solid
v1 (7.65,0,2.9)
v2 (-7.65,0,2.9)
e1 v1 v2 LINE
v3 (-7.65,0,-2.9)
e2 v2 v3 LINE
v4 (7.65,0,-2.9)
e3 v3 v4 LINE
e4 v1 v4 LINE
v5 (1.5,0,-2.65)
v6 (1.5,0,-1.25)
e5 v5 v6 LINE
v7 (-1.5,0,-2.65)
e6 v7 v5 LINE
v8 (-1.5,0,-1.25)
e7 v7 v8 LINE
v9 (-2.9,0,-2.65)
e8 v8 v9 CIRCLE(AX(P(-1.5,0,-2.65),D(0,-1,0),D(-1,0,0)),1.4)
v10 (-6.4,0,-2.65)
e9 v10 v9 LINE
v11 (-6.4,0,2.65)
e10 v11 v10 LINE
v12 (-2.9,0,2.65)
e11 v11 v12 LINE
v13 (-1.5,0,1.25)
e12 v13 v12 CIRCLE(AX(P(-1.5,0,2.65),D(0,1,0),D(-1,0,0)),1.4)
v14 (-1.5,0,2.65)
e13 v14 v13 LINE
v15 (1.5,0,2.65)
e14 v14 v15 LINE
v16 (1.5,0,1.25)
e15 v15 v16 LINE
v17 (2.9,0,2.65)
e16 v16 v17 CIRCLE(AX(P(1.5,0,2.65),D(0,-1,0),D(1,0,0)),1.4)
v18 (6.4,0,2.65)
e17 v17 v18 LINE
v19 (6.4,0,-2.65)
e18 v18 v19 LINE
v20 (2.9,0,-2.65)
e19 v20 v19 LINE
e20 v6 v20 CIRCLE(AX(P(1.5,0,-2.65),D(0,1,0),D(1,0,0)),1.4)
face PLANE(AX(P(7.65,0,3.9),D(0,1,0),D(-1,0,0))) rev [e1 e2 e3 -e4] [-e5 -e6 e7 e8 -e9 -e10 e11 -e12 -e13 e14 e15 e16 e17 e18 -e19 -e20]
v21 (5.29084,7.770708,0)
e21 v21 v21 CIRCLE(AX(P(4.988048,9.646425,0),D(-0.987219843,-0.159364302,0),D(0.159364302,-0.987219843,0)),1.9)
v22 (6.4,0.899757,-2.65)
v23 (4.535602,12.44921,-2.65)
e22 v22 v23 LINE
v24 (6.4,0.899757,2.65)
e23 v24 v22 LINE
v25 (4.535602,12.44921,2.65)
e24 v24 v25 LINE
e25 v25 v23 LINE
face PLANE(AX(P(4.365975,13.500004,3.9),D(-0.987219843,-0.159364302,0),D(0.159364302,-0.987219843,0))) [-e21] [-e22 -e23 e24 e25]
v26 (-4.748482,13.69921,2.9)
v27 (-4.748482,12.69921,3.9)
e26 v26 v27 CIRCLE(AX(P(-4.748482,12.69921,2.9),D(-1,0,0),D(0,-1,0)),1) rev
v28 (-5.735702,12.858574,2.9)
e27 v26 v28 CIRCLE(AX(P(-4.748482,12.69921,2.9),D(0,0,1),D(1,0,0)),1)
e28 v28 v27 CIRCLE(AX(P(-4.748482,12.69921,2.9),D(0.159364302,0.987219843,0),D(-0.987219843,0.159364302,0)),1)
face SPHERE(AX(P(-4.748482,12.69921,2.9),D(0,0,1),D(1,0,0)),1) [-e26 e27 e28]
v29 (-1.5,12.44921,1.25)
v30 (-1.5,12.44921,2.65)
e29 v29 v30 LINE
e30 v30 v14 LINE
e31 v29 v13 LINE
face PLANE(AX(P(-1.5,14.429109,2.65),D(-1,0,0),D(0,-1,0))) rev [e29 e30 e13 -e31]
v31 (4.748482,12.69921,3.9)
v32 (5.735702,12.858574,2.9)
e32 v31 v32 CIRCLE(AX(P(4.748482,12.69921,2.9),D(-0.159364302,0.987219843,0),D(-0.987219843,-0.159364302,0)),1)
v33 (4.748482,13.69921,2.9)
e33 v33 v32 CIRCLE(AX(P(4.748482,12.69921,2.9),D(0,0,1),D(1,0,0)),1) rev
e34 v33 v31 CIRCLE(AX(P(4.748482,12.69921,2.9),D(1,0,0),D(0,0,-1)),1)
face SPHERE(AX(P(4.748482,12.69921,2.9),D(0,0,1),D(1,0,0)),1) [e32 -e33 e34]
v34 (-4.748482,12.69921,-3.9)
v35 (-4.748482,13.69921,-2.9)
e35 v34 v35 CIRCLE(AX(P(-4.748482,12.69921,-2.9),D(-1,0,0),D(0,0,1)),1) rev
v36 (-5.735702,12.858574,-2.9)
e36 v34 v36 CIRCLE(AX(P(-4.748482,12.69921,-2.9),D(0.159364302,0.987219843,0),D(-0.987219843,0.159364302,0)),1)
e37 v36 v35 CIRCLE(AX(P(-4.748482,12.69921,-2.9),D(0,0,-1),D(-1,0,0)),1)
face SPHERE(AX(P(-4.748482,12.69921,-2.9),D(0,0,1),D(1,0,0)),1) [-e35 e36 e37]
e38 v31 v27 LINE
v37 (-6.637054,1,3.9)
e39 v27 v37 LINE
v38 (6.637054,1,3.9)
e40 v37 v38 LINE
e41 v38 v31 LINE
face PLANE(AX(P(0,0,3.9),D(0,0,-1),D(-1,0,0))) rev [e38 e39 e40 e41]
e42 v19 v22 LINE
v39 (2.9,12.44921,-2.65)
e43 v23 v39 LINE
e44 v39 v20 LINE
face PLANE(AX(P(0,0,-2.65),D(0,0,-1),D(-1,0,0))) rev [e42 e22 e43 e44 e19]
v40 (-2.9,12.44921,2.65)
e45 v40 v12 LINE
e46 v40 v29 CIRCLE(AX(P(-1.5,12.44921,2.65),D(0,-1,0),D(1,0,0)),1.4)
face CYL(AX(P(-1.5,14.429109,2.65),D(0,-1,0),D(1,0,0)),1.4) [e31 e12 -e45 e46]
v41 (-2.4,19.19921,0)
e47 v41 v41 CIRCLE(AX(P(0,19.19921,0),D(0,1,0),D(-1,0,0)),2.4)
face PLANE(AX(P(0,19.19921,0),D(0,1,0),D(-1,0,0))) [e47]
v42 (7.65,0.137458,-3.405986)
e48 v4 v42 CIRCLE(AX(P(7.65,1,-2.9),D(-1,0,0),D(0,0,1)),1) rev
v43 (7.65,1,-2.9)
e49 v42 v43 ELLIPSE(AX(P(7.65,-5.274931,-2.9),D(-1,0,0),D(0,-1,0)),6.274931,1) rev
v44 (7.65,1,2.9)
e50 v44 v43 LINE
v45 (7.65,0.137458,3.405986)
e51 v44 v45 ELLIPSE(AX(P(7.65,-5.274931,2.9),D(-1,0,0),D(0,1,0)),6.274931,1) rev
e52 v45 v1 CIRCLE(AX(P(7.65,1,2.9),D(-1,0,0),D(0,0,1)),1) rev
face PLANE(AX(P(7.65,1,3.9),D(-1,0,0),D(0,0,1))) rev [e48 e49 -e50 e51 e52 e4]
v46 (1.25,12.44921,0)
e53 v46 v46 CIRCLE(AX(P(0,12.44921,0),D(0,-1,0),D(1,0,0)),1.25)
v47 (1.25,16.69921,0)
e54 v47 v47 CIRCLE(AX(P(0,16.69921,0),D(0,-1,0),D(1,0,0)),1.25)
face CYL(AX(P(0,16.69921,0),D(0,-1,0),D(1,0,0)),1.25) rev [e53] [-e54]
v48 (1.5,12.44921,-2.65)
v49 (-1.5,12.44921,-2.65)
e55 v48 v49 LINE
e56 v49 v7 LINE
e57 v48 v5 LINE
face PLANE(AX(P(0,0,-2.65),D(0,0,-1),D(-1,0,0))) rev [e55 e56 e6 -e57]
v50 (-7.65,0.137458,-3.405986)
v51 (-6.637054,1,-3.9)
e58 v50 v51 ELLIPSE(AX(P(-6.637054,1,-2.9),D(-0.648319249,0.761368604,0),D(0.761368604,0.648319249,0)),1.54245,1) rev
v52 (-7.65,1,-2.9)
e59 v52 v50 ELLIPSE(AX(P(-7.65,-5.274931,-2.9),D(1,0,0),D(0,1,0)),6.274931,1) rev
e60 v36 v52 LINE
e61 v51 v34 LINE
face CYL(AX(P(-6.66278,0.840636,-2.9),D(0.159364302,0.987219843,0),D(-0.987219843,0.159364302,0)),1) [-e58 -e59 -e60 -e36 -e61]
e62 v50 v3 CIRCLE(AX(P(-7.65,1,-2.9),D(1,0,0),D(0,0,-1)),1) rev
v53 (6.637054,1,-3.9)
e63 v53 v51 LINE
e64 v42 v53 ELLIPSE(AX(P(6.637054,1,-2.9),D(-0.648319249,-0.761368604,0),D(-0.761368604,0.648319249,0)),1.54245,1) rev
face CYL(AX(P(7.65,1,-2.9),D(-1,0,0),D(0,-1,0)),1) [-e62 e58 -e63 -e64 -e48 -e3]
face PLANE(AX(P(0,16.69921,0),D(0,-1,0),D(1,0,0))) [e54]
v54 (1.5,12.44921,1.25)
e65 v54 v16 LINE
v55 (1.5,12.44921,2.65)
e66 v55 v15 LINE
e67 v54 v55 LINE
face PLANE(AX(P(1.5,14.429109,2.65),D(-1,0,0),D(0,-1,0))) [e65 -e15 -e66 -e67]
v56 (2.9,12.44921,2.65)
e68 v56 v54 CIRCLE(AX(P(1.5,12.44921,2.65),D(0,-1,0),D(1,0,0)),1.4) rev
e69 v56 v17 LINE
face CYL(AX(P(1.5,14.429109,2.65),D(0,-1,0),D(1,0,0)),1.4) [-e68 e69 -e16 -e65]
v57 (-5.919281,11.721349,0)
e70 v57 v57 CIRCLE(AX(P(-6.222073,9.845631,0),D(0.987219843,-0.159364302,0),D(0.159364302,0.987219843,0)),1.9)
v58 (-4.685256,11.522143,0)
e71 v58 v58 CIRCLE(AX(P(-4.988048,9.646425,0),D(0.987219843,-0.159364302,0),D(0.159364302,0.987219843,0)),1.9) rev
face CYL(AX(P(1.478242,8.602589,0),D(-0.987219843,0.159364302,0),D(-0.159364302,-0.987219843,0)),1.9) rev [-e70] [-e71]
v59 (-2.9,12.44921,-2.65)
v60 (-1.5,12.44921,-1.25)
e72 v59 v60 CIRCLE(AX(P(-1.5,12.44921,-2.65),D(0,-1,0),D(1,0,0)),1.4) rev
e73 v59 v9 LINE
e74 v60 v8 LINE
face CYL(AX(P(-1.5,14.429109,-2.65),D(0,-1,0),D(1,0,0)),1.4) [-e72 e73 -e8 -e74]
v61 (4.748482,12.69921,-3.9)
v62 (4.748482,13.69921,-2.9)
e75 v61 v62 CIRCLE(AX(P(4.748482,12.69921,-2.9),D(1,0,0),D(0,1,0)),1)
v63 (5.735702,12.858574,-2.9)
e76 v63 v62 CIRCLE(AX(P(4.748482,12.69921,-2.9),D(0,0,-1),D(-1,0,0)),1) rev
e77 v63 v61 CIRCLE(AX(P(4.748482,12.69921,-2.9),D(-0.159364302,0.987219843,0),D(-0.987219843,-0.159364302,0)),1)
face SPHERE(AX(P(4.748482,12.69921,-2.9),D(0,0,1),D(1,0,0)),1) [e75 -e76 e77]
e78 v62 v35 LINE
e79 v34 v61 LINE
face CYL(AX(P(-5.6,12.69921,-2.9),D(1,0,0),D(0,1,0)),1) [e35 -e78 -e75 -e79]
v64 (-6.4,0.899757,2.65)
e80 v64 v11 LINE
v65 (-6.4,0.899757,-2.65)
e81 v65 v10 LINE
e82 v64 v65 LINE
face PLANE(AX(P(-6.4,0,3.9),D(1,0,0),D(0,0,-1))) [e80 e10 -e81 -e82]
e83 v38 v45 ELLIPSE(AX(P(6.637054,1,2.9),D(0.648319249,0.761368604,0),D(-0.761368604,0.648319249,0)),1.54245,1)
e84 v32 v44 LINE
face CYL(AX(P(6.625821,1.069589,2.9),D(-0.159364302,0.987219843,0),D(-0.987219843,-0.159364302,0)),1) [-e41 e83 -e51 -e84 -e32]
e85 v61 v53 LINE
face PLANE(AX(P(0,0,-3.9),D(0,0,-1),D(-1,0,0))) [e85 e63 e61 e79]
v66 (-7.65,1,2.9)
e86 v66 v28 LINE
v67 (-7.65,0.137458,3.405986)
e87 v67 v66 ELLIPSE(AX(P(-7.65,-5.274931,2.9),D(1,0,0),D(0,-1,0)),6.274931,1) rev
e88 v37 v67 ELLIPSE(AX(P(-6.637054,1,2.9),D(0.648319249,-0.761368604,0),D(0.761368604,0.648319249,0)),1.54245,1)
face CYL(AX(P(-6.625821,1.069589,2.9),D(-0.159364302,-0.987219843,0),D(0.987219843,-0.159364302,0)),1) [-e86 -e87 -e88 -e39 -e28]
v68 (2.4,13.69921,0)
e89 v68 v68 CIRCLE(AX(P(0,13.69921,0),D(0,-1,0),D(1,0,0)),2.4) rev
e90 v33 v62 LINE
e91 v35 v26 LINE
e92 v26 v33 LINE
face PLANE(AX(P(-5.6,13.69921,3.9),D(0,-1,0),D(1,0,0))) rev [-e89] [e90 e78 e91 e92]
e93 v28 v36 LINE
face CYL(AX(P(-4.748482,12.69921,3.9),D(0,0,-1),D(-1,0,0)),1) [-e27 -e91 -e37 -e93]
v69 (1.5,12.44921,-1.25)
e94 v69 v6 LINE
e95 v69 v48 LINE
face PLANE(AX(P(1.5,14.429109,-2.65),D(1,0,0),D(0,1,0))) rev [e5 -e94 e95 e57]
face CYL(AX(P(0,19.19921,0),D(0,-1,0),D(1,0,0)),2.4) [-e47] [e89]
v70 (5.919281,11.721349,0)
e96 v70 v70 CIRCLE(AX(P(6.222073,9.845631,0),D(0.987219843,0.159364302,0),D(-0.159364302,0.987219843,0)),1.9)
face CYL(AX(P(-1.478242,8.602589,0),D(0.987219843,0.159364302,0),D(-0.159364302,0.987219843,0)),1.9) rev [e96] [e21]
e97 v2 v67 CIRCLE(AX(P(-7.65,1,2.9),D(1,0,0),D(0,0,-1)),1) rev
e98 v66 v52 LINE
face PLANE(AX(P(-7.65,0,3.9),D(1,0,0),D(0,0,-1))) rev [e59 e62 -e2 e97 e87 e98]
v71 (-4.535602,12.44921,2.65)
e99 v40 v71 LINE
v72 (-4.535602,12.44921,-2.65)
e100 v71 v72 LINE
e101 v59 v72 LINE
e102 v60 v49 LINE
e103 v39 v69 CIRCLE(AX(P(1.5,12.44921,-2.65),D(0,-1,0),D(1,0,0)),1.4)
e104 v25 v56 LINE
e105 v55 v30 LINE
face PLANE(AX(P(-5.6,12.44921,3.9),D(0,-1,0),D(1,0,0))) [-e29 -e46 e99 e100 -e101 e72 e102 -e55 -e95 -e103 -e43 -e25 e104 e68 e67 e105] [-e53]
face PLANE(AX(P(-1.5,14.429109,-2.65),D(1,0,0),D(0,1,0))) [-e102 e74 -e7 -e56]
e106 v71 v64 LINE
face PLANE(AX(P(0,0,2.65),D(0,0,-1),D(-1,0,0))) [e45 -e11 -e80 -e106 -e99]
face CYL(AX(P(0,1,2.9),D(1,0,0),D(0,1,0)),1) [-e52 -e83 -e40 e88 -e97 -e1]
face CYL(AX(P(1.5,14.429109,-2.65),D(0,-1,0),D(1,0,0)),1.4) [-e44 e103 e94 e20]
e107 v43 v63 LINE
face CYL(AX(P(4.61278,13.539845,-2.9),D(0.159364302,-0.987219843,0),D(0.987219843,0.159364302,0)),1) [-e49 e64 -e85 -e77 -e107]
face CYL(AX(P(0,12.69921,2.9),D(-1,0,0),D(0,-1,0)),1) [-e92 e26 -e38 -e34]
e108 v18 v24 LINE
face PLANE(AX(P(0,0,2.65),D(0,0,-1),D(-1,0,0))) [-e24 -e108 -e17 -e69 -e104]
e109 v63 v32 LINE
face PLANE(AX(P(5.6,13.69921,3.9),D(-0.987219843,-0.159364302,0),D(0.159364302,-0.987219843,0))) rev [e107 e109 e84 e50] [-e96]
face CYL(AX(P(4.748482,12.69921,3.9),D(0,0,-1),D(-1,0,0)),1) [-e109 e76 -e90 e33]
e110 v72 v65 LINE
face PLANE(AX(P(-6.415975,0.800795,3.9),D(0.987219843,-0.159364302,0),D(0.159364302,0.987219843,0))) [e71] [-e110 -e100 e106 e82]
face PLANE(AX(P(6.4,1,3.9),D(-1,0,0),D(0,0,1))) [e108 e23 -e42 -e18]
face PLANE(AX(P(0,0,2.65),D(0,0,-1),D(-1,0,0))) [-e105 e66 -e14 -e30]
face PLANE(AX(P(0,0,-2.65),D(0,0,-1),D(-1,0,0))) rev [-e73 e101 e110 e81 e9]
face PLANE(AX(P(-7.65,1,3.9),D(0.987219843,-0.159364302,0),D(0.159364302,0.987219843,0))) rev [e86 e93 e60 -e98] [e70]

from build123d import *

# Parameters (mm, degrees)
BOSS_EXTRUDE1_DEPTH  = 3.9
SHELL2_T             = -1.25
SKETCH5_R            = 1.9
CUT_EXTRUDE2_DEPTH   = 7.8
FILLET1_R            = 1
SKETCH6_R            = 2.4
BOSS_EXTRUDE2_DEPTH  = 5.5
SKETCH7_R            = 1.25
CUT_EXTRUDE3_DEPTH   = 4.25
BOSS_EXTRUDE3_DEPTH  = 12.449209595
MIRROR3_COPY_1_DEPTH = 12.449209595


with BuildPart() as part:
    # Sketch4 → Boss-Extrude1 (new, symmetric)
    with BuildSketch(Plane.XY):
        Polygon((7.65, 0), (-7.65, 0), (-7.65, 1), (-5.6, 13.699209595), (5.6, 13.699209595), (7.65, 1), align=None)
    extrude(amount=BOSS_EXTRUDE1_DEPTH, both=True)

    # Shell2
    shell2_openings = [part.faces().sort_by_distance(p)[0] for p in [
        (0, 0, 0),
    ]]
    offset(amount=SHELL2_T, openings=shell2_openings, kind=Kind.INTERSECTION)

    # Sketch5 → Cut-Extrude2 (cut)
    with BuildSketch(Plane(origin=(7.613040698, 1.228953134, 0), x_dir=(0, 0, -1), z_dir=(0.9872198433487761, 0.15936430245954739, 0))):
        with Locations(Location((0, 8.728225826, 0), (0, 0, 90))):
            Circle(SKETCH5_R)
    cut_extrude2 = extrude(amount=-CUT_EXTRUDE2_DEPTH, mode=Mode.SUBTRACT)

    # Mirror1: Cut-Extrude2 across plane
    add(cut_extrude2.mirror(Plane(origin=(0, 0, 0), x_dir=(0, 0, 1), z_dir=(1, 0, 0))), mode=Mode.SUBTRACT)

    # Fillet1
    # the kernel refuses this fillet: 1 mm, written as the material it takes off along each edge
    with BuildSketch(Plane(origin=(4.748481766, 12.699209595, -2.9), x_dir=(0, 1, 0), z_dir=(0, 0, -1))) as fillet1_piece_1_section:
        Polygon((0, 0), (FILLET1_R, 0), (FILLET1_R, FILLET1_R * 0.851518233962), (FILLET1_R * 0.15936430246, FILLET1_R * 0.987219843349), align=None)
    fillet1_piece_1 = extrude(amount=FILLET1_R, mode=Mode.PRIVATE)
    fillet1_piece_1 = fillet1_piece_1 - Plane(origin=(4.748481766, 12.699209595, -2.9), x_dir=(-0.6483192491128319, -0.7613686040478513, 0), z_dir=(0, 0, -1)) * Sphere(FILLET1_R, mode=Mode.PRIVATE)
    add(fillet1_piece_1, mode=Mode.SUBTRACT)
    with BuildSketch(Plane(origin=(4.748481766, 12.699209595, 2.9), x_dir=(0, 1, 0), z_dir=(0, 0, 1))) as fillet1_piece_2_section:
        Polygon((0, 0), (FILLET1_R, 0), (FILLET1_R, -FILLET1_R * 0.851518233962), (FILLET1_R * 0.15936430246, -FILLET1_R * 0.987219843349), align=None)
    fillet1_piece_2 = extrude(amount=FILLET1_R, mode=Mode.PRIVATE)
    fillet1_piece_2 = fillet1_piece_2 - Plane(origin=(4.748481766, 12.699209595, 2.9), x_dir=(-0.6483192491128319, -0.7613686040478513, 0), z_dir=(0, 0, 1)) * Sphere(FILLET1_R, mode=Mode.PRIVATE)
    add(fillet1_piece_2, mode=Mode.SUBTRACT)
    with BuildSketch(Plane(origin=(-4.748481766, 12.699209595, 2.9), x_dir=(-0.9872198433487762, 0.15936430245954666, 0), z_dir=(0, 0, 1))) as fillet1_piece_3_section:
        Polygon((0, 0), (FILLET1_R, 0), (FILLET1_R, -FILLET1_R * 0.851518233962), (FILLET1_R * 0.15936430246, -FILLET1_R * 0.987219843349), align=None)
    fillet1_piece_3 = extrude(amount=FILLET1_R, mode=Mode.PRIVATE)
    fillet1_piece_3 = fillet1_piece_3 - Plane(origin=(-4.748481766, 12.699209595, 2.9), x_dir=(0.6483192491128325, -0.7613686040478509, 0), z_dir=(0, 0, 1)) * Sphere(FILLET1_R, mode=Mode.PRIVATE)
    add(fillet1_piece_3, mode=Mode.SUBTRACT)
    with BuildSketch(Plane(origin=(-4.748481766, 12.699209595, -2.9), x_dir=(-0.9872198433487762, 0.15936430245954666, 0), z_dir=(0, 0, -1))) as fillet1_piece_4_section:
        Polygon((0, 0), (FILLET1_R, 0), (FILLET1_R, FILLET1_R * 0.851518233962), (FILLET1_R * 0.15936430246, FILLET1_R * 0.987219843349), align=None)
    fillet1_piece_4 = extrude(amount=FILLET1_R, mode=Mode.PRIVATE)
    fillet1_piece_4 = fillet1_piece_4 - Plane(origin=(-4.748481766, 12.699209595, -2.9), x_dir=(0.6483192491128325, -0.7613686040478509, 0), z_dir=(0, 0, -1)) * Sphere(FILLET1_R, mode=Mode.PRIVATE)
    add(fillet1_piece_4, mode=Mode.SUBTRACT)
    with BuildSketch(Plane(origin=(5.6, 13.699209595, -2.9), x_dir=(-1, 0, 0), z_dir=(0, 0, 1))) as fillet1_piece_5:
        with BuildLine():
            CenterArc((FILLET1_R * 0.851518233962, FILLET1_R), FILLET1_R, 189.17, 80.83)
            Line((-FILLET1_R * 0.135701609387, FILLET1_R * 0.84063569754), (0, 0))
            Line((0, 0), (FILLET1_R * 0.851518233962, 0))
        make_face()
    extrude(amount=5.8, mode=Mode.SUBTRACT)
    with BuildSketch(Plane(origin=(-4.748481766, 13.699209595, 3.9), x_dir=(0, -1, 0), z_dir=(1, 0, 0)), Plane(origin=(-4.748481766, 13.699209595, -3.9), x_dir=(0, 0, 1), z_dir=(1, 0, 0))) as fillet1_piece_6:
        with BuildLine():
            CenterArc((FILLET1_R, FILLET1_R), FILLET1_R, 180, 90)
            Line((0, FILLET1_R), (0, 0))
            Line((0, 0), (FILLET1_R, 0))
        make_face()
    extrude(amount=9.496963532, mode=Mode.SUBTRACT)
    with BuildSketch(Plane(origin=(-5.6, 13.699209595, 2.9), x_dir=(-0.15936430245954636, -0.9872198433487762, 0), z_dir=(0, 0, -1))) as fillet1_piece_7:
        with BuildLine():
            CenterArc((FILLET1_R * 0.851518233962, -FILLET1_R), FILLET1_R, 90, 80.83)
            Line((-FILLET1_R * 0.135701609387, -FILLET1_R * 0.84063569754), (0, 0))
            Line((0, 0), (FILLET1_R * 0.851518233962, 0))
        make_face()
    extrude(amount=5.8, mode=Mode.SUBTRACT)
    with BuildSketch(Plane(origin=(5.735701609, 12.858573897, 3.9), x_dir=(-0.9872198433487762, -0.15936430245954736, 0), z_dir=(0.15936430245954736, -0.9872198433487761, 0)), Plane(origin=(5.735701609, 12.858573897, -3.9), x_dir=(0, 0, 1), z_dir=(0.15936430245954736, -0.9872198433487761, 0)), Plane(origin=(-8.048410756, -1.468049608, -3.9), x_dir=(0, 0, 1), z_dir=(0.15936430245954666, 0.9872198433487762, 0)), Plane(origin=(-8.048410756, -1.468049608, 3.9), x_dir=(0.9872198433487762, -0.15936430245954664, 0), z_dir=(0.15936430245954666, 0.9872198433487762, 0))) as fillet1_piece_8:
        with BuildLine():
            CenterArc((FILLET1_R, FILLET1_R), FILLET1_R, 180, 90)
            Line((0, FILLET1_R), (0, 0))
            Line((0, 0), (FILLET1_R, 0))
        make_face()
    extrude(amount=14.512090293, mode=Mode.SUBTRACT)
    with BuildSketch(Plane(origin=(10.15, 0, 3.9), x_dir=(0, 1, 0), z_dir=(-1, 0, 0)), Plane(origin=(10.15, 0, -3.9), x_dir=(0, 0, 1), z_dir=(-1, 0, 0))) as fillet1_piece_9:
        with BuildLine():
            CenterArc((FILLET1_R, FILLET1_R), FILLET1_R, 180, 90)
            Line((0, FILLET1_R), (0, 0))
            Line((0, 0), (FILLET1_R, 0))
        make_face()
    extrude(amount=20.3, mode=Mode.SUBTRACT)

    # Sketch6 → Boss-Extrude2 (add)
    with BuildSketch(Plane(origin=(0, 13.699209595, 0), x_dir=(1, 0, 0), z_dir=(0, 1, 0))):
        Circle(SKETCH6_R)
    extrude(amount=BOSS_EXTRUDE2_DEPTH)

    # Sketch7 → Cut-Extrude3 (cut)
    with BuildSketch(Plane.XZ.offset(-12.449209595)):
        Circle(SKETCH7_R)
    extrude(amount=-CUT_EXTRUDE3_DEPTH, mode=Mode.SUBTRACT)

    # Sketch8 → Boss-Extrude3 (add)
    with BuildSketch(Plane.XZ):
        with BuildLine():
            Line((-1.5, -2.65), (-1.5, -1.25))
            ThreePointArc((-1.5, -1.25), (-2.489949494, -1.660050506), (-2.9, -2.65))
            Line((-2.9, -2.65), (-1.5, -2.65))
        make_face()
    boss_extrude3 = extrude(amount=-BOSS_EXTRUDE3_DEPTH)

    # Mirror2: Boss-Extrude3 across plane
    add(boss_extrude3.mirror(Plane(origin=(0, 0, 0), x_dir=(0, 0, 1), z_dir=(1, 0, 0))))

    # Mirror3: Boss-Extrude3 across plane
    add(boss_extrude3.mirror(Plane.XY))

    # Mirror3 copy 1 sketch → Mirror3 copy 1 (add)
    with BuildSketch(Plane(origin=(0, 0, 0), x_dir=(-1, 0, 0), z_dir=(0, -1, 0))):
        with BuildLine():
            Line((-1.5, -2.65), (-1.5, -1.25))
            ThreePointArc((-1.5, -1.25), (-2.489949494, -1.660050506), (-2.9, -2.65))
            Line((-2.9, -2.65), (-1.5, -2.65))
        make_face()
    extrude(amount=-MIRROR3_COPY_1_DEPTH)


solid = part.part
